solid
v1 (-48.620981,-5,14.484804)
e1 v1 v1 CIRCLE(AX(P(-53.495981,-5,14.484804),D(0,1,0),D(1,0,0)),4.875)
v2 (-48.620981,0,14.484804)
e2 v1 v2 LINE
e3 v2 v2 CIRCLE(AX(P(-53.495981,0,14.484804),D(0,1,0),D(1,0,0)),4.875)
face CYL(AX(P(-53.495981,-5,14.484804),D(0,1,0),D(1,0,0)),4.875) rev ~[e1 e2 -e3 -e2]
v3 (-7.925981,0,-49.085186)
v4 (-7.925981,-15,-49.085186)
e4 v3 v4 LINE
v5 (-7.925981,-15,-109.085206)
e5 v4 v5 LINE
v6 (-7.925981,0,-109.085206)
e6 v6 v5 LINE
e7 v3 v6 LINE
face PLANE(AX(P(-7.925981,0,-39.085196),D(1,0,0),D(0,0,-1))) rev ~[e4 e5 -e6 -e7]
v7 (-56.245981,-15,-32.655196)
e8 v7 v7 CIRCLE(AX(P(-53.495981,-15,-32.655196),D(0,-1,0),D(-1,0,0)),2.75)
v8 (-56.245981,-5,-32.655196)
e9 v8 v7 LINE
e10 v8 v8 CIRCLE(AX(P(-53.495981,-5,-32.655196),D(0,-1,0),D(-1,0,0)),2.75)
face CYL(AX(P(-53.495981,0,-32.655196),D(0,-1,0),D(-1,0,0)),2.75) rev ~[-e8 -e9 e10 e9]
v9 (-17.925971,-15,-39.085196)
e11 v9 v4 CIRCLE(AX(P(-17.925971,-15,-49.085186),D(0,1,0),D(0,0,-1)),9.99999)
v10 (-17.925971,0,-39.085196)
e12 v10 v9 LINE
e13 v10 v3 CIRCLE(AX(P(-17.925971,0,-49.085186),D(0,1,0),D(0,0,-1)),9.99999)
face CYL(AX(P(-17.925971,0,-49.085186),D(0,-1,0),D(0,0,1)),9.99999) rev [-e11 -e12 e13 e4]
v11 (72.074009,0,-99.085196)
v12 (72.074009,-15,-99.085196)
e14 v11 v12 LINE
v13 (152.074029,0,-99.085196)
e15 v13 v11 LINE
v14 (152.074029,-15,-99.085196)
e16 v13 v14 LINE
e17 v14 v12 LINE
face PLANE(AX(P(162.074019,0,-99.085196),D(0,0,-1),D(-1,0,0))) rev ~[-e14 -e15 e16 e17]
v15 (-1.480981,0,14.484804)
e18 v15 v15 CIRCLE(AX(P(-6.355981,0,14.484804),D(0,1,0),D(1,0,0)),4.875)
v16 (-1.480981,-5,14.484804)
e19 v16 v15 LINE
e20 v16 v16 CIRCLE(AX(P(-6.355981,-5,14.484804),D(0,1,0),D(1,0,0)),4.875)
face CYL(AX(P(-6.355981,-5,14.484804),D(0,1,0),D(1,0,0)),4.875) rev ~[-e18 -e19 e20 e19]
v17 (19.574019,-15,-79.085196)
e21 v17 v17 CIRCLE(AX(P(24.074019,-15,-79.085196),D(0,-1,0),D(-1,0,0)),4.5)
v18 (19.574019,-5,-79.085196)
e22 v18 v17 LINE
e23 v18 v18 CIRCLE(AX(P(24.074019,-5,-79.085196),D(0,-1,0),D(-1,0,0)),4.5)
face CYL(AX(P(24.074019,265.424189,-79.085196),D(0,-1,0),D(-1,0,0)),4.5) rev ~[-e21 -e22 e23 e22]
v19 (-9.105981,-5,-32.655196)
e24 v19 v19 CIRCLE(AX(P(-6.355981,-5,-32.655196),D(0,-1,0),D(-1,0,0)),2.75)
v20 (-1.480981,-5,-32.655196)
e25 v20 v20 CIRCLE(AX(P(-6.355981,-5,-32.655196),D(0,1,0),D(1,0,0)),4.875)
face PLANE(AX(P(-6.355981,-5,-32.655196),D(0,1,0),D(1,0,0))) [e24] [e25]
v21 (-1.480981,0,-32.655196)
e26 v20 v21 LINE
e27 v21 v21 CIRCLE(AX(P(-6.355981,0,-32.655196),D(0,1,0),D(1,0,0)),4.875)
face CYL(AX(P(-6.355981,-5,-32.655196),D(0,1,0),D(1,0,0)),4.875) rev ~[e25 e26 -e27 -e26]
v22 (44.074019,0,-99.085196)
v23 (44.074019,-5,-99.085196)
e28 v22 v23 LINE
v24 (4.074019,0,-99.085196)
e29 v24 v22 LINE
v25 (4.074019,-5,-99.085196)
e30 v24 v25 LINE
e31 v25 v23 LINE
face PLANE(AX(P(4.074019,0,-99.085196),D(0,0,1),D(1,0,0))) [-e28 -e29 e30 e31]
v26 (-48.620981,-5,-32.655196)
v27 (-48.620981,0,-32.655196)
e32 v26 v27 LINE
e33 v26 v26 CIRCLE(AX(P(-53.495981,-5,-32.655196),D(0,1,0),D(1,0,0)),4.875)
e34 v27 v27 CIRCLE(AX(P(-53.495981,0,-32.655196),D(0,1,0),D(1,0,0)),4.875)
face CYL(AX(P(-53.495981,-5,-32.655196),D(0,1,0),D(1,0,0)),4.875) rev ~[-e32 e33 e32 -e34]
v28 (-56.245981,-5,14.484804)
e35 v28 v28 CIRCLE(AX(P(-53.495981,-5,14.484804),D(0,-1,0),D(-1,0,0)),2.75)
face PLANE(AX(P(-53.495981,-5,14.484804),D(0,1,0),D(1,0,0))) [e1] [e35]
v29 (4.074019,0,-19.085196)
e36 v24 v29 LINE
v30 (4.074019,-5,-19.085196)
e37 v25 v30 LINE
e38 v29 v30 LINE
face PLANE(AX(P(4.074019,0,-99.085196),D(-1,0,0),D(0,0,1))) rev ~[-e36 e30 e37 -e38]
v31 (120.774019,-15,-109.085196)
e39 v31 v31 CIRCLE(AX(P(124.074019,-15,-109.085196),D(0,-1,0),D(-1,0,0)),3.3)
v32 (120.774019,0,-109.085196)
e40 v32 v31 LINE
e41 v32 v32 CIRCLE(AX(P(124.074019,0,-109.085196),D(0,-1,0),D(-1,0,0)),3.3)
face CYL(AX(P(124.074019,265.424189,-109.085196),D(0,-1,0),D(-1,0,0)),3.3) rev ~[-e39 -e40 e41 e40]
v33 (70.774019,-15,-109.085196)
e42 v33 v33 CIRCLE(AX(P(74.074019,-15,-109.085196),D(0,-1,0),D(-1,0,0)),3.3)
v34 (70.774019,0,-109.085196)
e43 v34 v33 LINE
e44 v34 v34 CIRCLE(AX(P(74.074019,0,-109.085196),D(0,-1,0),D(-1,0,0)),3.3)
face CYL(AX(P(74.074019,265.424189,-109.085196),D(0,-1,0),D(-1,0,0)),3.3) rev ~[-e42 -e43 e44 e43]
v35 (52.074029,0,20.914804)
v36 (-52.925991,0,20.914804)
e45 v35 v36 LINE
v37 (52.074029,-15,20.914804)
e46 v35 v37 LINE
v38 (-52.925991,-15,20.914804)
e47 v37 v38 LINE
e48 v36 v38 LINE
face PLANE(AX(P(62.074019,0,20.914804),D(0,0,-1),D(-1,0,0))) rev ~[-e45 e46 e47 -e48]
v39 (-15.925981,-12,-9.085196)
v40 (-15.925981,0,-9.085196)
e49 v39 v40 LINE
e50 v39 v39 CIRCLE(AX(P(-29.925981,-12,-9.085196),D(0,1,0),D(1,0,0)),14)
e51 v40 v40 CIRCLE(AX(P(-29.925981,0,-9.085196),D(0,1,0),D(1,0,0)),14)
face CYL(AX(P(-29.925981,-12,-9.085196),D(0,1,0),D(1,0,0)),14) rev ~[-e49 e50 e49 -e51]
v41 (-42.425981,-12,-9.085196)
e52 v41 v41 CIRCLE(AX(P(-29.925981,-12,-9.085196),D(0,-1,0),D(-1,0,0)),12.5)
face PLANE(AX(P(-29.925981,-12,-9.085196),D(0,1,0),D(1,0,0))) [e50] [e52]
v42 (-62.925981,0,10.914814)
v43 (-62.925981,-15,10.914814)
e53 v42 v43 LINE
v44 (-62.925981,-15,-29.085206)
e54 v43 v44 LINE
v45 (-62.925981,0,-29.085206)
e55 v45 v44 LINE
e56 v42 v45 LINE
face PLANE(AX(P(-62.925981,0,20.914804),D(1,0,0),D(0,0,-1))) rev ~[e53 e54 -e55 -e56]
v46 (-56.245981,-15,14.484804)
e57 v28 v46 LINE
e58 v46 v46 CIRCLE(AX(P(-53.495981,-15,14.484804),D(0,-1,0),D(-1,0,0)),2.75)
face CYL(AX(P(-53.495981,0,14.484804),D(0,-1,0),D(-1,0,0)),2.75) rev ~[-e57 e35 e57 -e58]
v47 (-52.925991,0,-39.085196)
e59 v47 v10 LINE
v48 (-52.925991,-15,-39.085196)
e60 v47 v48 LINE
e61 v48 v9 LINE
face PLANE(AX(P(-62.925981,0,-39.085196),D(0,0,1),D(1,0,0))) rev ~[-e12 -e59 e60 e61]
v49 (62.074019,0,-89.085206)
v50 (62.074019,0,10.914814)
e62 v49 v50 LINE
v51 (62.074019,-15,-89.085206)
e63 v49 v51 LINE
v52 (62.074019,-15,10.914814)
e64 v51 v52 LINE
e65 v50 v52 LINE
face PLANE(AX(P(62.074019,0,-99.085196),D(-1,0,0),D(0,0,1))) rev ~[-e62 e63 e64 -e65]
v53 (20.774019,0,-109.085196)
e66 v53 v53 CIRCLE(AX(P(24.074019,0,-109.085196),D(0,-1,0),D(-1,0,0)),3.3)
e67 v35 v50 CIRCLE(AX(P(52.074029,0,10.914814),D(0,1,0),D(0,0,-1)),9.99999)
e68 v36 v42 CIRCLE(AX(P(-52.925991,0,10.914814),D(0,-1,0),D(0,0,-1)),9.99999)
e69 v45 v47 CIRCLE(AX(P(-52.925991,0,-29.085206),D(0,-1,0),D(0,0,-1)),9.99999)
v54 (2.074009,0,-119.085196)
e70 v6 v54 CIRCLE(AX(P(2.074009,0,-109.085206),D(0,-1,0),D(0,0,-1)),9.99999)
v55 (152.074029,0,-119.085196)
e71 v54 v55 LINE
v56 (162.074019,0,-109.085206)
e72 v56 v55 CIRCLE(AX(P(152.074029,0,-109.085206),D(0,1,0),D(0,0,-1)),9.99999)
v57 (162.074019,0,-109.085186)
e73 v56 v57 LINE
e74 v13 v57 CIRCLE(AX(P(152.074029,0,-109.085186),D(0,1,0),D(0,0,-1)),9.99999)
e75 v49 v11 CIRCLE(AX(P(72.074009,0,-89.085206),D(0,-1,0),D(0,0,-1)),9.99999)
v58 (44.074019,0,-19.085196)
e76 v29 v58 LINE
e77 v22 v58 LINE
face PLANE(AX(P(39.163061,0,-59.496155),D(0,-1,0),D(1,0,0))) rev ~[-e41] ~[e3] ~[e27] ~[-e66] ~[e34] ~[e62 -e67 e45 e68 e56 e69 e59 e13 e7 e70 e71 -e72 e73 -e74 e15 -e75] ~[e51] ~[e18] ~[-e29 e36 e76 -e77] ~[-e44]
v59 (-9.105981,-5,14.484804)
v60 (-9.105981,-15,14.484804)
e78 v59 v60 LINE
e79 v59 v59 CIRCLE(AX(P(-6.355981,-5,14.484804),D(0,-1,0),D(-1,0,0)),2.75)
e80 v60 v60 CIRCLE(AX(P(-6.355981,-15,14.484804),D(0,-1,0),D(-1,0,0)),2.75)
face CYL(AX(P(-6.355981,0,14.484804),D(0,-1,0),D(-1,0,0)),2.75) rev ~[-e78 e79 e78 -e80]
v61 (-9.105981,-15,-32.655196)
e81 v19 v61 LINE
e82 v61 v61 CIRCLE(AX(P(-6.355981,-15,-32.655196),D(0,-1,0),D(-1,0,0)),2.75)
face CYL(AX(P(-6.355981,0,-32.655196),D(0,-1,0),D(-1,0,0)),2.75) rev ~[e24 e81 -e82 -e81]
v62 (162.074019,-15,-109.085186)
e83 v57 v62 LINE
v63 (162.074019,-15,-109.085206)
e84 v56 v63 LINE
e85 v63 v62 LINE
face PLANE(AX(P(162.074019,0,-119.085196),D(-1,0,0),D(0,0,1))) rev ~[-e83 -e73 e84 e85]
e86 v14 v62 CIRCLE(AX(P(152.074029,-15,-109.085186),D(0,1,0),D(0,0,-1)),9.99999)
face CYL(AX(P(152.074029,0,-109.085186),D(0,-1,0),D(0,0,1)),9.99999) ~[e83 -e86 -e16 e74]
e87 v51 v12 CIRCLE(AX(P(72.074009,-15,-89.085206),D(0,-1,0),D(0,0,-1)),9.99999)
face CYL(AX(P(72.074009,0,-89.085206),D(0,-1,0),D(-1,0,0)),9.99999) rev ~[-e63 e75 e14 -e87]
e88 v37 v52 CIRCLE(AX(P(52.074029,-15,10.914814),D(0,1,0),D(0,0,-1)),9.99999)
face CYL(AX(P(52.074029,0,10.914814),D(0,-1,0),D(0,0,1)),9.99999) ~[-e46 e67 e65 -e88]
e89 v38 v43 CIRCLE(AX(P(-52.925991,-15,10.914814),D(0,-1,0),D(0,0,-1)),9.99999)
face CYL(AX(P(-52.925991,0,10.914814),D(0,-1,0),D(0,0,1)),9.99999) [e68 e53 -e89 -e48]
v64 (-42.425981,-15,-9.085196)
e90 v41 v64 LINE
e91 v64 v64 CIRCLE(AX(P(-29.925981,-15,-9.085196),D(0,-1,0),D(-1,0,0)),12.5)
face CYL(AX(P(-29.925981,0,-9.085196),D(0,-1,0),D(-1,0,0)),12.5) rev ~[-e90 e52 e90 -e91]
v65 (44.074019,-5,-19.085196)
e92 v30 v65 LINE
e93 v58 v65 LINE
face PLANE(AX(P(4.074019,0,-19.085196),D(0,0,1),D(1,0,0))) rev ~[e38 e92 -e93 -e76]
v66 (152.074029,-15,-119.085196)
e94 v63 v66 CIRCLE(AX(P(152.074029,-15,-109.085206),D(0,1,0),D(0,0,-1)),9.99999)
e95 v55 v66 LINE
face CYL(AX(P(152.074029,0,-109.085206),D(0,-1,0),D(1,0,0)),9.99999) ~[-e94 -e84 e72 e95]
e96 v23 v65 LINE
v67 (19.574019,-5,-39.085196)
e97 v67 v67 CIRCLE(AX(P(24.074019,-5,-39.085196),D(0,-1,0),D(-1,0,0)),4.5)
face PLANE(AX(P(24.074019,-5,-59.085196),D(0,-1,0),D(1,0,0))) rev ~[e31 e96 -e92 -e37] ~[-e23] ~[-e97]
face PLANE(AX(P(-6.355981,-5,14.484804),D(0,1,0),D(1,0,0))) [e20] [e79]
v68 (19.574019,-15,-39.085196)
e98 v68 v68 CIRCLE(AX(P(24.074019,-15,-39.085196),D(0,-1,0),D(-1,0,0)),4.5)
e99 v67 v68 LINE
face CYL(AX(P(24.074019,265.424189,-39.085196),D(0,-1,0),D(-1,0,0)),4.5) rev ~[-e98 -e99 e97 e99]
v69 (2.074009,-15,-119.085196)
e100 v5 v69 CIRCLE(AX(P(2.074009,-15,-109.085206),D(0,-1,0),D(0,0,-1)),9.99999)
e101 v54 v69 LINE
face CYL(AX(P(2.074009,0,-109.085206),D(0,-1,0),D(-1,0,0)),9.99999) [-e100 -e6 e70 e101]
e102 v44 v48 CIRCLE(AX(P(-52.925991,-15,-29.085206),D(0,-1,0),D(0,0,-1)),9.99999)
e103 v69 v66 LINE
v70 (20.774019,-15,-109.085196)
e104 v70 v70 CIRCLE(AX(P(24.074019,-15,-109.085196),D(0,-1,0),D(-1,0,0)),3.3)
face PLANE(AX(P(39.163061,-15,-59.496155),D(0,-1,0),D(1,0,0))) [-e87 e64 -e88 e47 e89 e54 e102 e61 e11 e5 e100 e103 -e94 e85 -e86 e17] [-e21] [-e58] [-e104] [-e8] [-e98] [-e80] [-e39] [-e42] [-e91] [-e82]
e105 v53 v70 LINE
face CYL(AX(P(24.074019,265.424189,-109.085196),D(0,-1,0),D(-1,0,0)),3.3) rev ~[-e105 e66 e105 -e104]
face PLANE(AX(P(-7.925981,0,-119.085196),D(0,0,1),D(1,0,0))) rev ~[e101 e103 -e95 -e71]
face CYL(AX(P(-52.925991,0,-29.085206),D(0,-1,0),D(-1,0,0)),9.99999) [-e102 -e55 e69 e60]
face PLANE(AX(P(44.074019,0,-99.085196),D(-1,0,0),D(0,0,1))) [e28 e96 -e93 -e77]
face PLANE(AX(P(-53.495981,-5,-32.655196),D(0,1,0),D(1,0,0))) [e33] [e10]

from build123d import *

# Parameters (mm, degrees)
F1_DEPTH       = 15
F2_D           = 9
F3_D           = 6.6
F4_R           = 9.99999
F5_D           = 25
F5_CBORE_D     = 28
F5_CBORE_DEPTH = 12
F6_D           = 5.5
F6_CBORE_D     = 9.75
F6_CBORE_DEPTH = 5
F7_W           = 40
F7_H           = 80
F8_DEPTH       = 5


# Not quite as in the source:
# - a fillet or chamfer is up to 0.001 mm smaller than in the source, because OpenCascade refuses the exact size


with BuildPart() as f1:
    # F0 (on Front) → F1 (new body)
    with BuildSketch(Plane.XZ):
        Polygon((62.0740194619, 20.9148037434), (-57.9259805381, 20.9148037434), (-62.9259805381, 20.9148037434), (-62.9259805381, -39.0851962566), (-57.9259805381, -39.0851962566), (-7.9259805381, -39.0851962566), (-7.9259805381, -119.0851962566), (162.0740194619, -119.0851962566), (162.0740194619, -99.0851962566), (62.0740194619, -99.0851962566), align=None)
    extrude(amount=F1_DEPTH)

    # F2 (through all)
    with Locations(Plane(origin=(0, 0, 0), x_dir=(1, 0, 0), z_dir=(0, 1, 0))):
        with Locations((24.0740194619, 79.0851962566), (24.0740194619, 39.0851962566)):
            Hole(F2_D / 2)

    # F3 (through all)
    with Locations(Plane(origin=(0, 0, 0), x_dir=(1, 0, 0), z_dir=(0, 1, 0))):
        with Locations((24.0740194619, 109.0851962566), (74.0740194619, 109.0851962566), (124.0740194619, 109.0851962566)):
            Hole(F3_D / 2)

    # F4 (radius 10 in the source; OpenCascade refuses exactly that, so slightly less here)
    f4_edges = [f1.edges().sort_by_distance(p)[0] for p in [
        (62.074019, -7.5, 20.914804),
        (62.074019, -7.5, -99.085196),
        (162.074019, -7.5, -119.085196),
        (162.074019, -7.5, -99.085196),
        (-7.925981, -7.5, -119.085196),
        (-7.925981, -7.5, -39.085196),
        (-62.925981, -7.5, 20.914804),
        (-62.925981, -7.5, -39.085196),
    ]]
    fillet(f4_edges, radius=F4_R)

    # F5 (through all)
    with Locations(Plane(origin=(0, 0, 0), x_dir=(1, 0, 0), z_dir=(0, 1, 0))):
        with Locations((-29.9259805381, 9.0851962566)):
            CounterBoreHole(F5_D / 2, F5_CBORE_D / 2, F5_CBORE_DEPTH)

    # F6 (through all)
    with Locations(Plane(origin=(0, 0, 0), x_dir=(1, 0, 0), z_dir=(0, 1, 0))):
        with Locations((-53.4959805381, -14.4848037434), (-6.3559805381, -14.4848037434), (-6.3559805381, 32.6551962566), (-53.4959805381, 32.6551962566)):
            CounterBoreHole(F6_D / 2, F6_CBORE_D / 2, F6_CBORE_DEPTH)

    # F7 (on face) → F8 (cut)
    with BuildSketch(Plane.XZ):
        with Locations((24.0740194619, -59.0851962566)):
            Rectangle(F7_W, F7_H)
    extrude(amount=F8_DEPTH, mode=Mode.SUBTRACT)


solid = f1.part
